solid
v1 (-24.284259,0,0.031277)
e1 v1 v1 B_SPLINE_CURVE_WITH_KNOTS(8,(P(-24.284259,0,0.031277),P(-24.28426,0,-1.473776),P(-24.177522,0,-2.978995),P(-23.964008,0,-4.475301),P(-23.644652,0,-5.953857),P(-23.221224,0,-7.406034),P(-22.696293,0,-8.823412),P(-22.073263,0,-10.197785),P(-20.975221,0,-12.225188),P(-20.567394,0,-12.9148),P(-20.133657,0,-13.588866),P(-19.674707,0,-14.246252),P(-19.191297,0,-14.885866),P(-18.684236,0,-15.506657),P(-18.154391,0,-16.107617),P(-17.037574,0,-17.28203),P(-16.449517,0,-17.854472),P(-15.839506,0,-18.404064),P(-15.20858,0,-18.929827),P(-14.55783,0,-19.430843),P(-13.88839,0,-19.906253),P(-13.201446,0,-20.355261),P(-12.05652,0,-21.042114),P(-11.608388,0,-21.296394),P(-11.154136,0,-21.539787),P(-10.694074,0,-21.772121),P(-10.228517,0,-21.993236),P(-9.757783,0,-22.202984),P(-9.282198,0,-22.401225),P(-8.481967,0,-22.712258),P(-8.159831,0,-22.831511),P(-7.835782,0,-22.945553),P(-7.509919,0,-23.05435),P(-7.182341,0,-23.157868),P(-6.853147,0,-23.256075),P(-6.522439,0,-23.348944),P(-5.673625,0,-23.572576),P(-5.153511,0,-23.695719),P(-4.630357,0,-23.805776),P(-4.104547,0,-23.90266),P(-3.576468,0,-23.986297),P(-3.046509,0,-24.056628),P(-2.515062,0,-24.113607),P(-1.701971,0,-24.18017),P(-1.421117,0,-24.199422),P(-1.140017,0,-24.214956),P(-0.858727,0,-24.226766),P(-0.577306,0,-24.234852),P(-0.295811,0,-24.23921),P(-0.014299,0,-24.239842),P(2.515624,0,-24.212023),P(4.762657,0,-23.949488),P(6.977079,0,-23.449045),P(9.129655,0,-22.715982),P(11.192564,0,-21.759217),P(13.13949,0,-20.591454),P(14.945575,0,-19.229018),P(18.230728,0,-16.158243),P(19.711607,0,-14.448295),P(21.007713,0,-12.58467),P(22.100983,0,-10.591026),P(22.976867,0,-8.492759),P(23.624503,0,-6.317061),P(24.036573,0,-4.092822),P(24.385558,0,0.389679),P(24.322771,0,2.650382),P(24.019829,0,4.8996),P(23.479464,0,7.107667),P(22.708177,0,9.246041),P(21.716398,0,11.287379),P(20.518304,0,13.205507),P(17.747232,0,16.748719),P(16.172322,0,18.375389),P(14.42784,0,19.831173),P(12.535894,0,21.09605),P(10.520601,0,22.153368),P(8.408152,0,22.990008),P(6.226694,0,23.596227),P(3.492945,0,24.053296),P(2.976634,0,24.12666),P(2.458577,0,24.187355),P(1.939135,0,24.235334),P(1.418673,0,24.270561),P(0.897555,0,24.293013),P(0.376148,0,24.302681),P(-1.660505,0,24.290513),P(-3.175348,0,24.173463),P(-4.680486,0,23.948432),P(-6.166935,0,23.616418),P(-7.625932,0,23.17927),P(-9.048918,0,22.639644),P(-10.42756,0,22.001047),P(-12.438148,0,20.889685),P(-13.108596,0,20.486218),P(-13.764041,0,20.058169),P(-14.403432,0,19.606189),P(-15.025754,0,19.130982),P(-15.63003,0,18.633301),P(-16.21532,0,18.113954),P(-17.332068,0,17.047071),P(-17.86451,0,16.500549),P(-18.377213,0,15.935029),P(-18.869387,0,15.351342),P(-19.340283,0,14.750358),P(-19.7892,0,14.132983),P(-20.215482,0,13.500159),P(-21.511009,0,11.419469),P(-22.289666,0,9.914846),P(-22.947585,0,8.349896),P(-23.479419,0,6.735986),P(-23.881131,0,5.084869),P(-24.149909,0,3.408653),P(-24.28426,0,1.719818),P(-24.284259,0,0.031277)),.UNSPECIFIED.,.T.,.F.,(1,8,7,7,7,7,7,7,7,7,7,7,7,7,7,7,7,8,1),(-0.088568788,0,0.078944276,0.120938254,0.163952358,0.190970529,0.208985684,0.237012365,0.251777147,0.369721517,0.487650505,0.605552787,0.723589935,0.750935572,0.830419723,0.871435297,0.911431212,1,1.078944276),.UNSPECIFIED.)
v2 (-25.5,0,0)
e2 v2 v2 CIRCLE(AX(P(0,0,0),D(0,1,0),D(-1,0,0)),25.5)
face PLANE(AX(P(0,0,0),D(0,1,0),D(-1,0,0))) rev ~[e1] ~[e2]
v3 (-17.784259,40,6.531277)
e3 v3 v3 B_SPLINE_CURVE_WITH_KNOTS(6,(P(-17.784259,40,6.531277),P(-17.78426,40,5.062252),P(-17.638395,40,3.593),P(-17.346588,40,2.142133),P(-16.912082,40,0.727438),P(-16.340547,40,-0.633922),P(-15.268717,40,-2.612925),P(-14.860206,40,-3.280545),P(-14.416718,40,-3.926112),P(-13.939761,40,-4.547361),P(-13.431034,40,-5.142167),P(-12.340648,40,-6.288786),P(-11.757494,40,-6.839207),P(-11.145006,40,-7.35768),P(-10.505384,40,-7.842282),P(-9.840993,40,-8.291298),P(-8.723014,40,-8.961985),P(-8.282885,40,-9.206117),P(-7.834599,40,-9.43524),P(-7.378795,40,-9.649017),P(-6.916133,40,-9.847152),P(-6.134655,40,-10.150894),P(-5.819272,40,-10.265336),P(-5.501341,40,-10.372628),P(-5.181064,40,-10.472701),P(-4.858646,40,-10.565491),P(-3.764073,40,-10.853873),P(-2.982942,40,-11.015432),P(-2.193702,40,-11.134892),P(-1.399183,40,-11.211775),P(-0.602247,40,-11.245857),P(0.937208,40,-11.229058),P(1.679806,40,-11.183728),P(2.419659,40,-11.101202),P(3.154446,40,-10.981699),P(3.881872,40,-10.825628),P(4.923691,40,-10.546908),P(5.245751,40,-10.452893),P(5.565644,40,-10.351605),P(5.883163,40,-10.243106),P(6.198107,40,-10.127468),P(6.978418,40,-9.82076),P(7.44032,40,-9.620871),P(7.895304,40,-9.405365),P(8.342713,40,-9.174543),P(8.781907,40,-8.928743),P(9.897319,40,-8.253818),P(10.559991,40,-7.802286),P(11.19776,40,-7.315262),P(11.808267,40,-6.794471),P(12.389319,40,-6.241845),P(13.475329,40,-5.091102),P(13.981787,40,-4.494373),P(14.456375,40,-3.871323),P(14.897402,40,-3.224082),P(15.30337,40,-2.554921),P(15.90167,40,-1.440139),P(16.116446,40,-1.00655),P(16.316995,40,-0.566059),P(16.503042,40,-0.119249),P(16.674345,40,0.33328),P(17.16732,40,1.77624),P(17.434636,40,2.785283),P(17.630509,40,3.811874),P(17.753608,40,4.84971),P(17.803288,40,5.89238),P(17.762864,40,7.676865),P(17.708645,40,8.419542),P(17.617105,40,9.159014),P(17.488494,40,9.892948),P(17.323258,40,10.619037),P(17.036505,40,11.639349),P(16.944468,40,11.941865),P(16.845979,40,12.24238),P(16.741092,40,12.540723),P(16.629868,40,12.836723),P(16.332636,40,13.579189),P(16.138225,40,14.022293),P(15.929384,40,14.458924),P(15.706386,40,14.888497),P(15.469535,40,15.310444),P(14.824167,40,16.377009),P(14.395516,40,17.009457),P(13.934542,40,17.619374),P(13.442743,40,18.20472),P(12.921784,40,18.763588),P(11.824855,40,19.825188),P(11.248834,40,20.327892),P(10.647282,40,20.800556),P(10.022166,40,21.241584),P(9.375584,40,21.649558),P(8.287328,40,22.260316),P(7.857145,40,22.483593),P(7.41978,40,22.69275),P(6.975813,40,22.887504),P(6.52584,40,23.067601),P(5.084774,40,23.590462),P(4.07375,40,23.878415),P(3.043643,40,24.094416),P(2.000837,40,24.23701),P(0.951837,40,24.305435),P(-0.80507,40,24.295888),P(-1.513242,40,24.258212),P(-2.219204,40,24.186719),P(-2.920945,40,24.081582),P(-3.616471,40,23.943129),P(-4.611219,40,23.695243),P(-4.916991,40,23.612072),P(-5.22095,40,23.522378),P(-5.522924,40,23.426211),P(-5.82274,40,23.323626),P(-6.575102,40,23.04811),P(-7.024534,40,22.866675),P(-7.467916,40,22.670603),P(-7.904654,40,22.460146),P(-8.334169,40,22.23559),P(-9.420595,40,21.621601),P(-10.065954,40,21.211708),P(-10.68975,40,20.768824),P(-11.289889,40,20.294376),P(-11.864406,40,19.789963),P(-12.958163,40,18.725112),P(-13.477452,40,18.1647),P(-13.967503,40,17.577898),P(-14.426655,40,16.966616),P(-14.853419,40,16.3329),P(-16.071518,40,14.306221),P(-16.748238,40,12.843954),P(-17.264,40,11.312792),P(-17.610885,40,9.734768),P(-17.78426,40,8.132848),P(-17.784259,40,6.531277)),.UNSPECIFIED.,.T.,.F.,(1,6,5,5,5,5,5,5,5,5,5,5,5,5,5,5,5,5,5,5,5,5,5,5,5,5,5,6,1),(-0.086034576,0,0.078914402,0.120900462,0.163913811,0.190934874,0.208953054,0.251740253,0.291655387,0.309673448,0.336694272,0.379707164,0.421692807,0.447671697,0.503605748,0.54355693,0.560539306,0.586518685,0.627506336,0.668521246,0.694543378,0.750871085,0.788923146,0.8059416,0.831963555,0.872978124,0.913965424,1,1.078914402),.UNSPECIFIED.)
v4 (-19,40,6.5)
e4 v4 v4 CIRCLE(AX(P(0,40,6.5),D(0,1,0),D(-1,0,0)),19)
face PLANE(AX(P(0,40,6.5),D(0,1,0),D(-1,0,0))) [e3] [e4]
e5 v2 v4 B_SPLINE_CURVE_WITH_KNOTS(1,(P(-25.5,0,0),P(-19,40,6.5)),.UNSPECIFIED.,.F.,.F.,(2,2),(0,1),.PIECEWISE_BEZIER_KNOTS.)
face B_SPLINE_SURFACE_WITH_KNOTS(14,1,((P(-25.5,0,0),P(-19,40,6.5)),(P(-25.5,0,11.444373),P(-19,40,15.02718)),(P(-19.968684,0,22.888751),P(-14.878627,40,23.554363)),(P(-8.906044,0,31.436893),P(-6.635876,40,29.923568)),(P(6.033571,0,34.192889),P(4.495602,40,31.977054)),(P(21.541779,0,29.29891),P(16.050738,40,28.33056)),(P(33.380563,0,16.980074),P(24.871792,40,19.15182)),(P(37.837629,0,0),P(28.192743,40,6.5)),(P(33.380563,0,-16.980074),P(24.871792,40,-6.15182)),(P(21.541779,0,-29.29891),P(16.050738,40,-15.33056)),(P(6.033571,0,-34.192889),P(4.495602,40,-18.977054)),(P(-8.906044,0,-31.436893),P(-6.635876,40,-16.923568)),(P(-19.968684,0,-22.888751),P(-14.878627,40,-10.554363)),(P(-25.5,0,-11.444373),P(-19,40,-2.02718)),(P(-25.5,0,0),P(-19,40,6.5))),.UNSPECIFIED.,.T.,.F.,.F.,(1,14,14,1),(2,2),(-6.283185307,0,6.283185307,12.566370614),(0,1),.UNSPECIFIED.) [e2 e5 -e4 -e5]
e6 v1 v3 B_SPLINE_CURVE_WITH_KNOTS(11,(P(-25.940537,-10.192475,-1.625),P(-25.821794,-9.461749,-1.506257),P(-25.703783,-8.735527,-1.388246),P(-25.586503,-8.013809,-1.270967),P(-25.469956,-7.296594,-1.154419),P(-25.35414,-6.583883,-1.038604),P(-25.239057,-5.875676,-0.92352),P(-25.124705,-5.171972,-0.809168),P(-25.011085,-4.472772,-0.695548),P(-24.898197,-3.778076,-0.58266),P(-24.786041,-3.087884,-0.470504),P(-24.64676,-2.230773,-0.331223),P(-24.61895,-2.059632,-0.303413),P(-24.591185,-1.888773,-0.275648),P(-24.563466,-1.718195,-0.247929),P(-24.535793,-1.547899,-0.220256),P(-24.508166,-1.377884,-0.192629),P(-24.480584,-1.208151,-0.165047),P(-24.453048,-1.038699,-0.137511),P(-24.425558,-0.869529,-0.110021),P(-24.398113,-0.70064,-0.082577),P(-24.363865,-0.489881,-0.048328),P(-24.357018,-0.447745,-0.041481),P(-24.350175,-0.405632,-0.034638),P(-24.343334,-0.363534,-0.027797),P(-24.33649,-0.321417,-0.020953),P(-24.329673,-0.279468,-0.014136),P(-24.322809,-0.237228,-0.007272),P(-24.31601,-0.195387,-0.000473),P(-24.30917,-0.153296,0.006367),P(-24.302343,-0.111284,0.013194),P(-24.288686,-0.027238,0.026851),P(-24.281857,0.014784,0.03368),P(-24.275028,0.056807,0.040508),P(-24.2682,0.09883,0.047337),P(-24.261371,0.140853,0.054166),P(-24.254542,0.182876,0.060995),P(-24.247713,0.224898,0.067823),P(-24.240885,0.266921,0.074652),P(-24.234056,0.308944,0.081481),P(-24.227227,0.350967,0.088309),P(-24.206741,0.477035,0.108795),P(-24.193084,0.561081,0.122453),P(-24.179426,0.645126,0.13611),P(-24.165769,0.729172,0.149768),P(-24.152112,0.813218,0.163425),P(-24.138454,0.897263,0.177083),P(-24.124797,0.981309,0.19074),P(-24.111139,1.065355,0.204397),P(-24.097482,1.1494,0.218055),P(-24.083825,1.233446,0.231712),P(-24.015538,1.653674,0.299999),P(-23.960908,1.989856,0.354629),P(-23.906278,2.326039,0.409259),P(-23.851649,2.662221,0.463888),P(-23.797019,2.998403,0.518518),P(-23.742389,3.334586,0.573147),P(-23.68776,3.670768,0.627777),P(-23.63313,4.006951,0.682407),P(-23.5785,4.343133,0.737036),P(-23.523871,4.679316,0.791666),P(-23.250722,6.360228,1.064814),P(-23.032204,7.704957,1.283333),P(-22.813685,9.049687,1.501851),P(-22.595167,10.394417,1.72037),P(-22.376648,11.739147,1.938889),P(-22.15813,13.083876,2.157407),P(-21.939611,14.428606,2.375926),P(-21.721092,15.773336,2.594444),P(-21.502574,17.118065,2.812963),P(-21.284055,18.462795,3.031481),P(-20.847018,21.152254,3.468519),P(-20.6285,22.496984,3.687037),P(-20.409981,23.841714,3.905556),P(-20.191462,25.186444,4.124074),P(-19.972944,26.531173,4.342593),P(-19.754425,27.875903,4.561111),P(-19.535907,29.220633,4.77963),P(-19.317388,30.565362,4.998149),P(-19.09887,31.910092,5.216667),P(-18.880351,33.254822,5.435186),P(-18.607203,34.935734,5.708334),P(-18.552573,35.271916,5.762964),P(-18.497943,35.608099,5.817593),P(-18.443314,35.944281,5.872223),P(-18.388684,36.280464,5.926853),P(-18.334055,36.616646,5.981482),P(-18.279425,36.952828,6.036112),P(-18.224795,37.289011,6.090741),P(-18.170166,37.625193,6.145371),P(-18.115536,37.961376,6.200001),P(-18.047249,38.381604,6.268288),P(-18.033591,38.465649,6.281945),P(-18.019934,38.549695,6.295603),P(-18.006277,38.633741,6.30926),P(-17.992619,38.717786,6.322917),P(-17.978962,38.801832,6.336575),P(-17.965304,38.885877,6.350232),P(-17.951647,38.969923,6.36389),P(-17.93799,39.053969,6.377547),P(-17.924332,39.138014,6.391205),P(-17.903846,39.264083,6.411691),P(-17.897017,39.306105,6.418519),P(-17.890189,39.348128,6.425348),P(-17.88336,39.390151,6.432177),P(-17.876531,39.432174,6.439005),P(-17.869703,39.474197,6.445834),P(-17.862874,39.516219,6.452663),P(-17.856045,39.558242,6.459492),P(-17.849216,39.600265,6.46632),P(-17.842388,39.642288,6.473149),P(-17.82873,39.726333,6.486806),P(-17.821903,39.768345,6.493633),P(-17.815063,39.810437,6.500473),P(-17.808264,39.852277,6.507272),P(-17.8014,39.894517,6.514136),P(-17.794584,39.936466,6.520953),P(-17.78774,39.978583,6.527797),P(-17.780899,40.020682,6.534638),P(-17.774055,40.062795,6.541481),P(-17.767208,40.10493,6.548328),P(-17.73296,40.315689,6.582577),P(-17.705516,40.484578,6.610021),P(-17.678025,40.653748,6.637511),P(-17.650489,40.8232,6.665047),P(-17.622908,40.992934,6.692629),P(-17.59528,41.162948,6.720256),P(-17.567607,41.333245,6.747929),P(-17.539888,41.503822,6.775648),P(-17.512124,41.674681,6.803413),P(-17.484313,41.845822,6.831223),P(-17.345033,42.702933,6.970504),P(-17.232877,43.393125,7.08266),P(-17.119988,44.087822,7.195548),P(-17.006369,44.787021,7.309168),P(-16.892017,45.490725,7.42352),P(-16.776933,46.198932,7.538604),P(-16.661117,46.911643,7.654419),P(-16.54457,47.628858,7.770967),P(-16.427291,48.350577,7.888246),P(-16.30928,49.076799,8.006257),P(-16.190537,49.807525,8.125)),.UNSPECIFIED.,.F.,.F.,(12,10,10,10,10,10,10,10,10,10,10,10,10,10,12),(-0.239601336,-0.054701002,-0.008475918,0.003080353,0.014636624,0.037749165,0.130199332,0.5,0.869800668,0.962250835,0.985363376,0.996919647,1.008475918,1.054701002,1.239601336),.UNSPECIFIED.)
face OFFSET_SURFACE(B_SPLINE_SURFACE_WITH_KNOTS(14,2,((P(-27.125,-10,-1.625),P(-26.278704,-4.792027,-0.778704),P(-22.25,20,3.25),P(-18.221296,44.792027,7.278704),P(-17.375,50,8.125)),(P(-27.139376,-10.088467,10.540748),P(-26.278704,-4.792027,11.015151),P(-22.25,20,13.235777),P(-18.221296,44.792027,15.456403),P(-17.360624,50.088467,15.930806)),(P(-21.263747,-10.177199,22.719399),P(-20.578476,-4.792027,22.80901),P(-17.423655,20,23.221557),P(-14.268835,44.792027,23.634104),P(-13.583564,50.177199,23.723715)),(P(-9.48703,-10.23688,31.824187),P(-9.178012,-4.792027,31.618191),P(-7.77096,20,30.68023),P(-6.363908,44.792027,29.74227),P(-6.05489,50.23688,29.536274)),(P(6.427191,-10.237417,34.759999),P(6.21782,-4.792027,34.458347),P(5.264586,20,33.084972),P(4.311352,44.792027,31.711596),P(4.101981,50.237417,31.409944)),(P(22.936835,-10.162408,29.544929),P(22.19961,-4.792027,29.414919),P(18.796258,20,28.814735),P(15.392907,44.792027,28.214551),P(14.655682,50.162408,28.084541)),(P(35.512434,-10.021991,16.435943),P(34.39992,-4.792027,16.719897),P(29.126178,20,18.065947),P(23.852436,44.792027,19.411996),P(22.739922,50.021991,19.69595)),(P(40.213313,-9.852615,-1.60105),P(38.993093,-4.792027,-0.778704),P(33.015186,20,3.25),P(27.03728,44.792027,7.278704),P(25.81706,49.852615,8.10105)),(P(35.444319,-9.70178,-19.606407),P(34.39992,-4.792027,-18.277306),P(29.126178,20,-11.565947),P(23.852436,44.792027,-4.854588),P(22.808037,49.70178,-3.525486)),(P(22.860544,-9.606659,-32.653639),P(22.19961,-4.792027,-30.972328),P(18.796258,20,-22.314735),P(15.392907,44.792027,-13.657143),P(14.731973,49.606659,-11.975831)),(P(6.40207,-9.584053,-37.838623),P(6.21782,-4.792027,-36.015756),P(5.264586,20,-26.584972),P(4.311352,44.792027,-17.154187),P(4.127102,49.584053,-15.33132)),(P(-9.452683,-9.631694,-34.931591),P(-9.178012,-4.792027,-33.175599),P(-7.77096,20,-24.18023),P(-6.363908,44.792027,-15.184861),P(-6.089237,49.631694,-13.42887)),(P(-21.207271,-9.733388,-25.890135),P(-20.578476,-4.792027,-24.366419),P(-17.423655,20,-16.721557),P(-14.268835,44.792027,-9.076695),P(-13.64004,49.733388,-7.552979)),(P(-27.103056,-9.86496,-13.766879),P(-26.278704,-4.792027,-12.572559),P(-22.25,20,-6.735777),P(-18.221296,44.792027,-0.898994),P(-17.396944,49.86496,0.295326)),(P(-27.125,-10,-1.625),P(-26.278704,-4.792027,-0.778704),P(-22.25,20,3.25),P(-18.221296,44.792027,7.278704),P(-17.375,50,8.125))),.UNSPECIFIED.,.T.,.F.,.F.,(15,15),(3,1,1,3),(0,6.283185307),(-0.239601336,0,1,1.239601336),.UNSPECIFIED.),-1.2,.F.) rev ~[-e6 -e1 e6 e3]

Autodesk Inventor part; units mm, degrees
ref_plane "YZ Plane" through (0, 0, 0) normal (1, 0, 0) x (0, 1, 0)
ref_plane "XY Plane" through (0, 0, 0) normal (0, 0, 1) x (1, 0, 0)
sketch "Szkic6" plane through (0, 0, 0) normal (0, 1, 0) x (-1, 0, 0)
  circle A0 centre (0, 0) radius 25.5
  dimension "d33" = 51
ref_plane "Płaszczyzna konstrukcyjna1" through (0, 40, 0) normal (0, 1, 0) x (-1, 0, 0)
sketch "Szkic7" plane through (0, 40, 0) normal (0, 1, 0) x (-1, 0, 0)
  circle A0 centre (0, 6.5) radius 19
  line L0 (0, -20.3) -> (0, 20.3) construction
  circle A1 centre (0, 0) radius 25.5 construction
  dimension "d35" = 38
loft "Wyciągnięcie złożone1" add profiles "Szkic6", "Szkic7"
shell "Skorupa1" thickness 1.2 removed faces 2 at (-4.1255, 40, 3.1914) at (4.5479, 0, -4.6843)
equation "\"d33\" = OD1"
equation "\"d35\" = OD2"
equation "\"d52\" = THK"
equation "\"SzerokośćGięciaPodcięcia\" = Grubość"
equation "\"RozmiarPodcięciaNarożnika\" = 4 * Grubość"
equation "\"PromieńPrzejścia\" = PromieńGięcia"
equation "\"Rozmiar_promienia_Jacobiego\" = PromieńGięcia"
equation "\"Wielk_odstępu\" = Grubość"
equation "\"d2\" = PromieńGięcia"
equation "\"d23\" = PromieńGięcia"
equation "\"OD1\" = 51"
equation "\"OD2\" = 38"
equation "\"THK\" = 1.2"
equation "\"Grubość\" = 1.5"
equation "\"PromieńGięcia\" = 3"
properties part number "Redukcja asymetryczna Ø51x38x1,2 L=40" material "304"
